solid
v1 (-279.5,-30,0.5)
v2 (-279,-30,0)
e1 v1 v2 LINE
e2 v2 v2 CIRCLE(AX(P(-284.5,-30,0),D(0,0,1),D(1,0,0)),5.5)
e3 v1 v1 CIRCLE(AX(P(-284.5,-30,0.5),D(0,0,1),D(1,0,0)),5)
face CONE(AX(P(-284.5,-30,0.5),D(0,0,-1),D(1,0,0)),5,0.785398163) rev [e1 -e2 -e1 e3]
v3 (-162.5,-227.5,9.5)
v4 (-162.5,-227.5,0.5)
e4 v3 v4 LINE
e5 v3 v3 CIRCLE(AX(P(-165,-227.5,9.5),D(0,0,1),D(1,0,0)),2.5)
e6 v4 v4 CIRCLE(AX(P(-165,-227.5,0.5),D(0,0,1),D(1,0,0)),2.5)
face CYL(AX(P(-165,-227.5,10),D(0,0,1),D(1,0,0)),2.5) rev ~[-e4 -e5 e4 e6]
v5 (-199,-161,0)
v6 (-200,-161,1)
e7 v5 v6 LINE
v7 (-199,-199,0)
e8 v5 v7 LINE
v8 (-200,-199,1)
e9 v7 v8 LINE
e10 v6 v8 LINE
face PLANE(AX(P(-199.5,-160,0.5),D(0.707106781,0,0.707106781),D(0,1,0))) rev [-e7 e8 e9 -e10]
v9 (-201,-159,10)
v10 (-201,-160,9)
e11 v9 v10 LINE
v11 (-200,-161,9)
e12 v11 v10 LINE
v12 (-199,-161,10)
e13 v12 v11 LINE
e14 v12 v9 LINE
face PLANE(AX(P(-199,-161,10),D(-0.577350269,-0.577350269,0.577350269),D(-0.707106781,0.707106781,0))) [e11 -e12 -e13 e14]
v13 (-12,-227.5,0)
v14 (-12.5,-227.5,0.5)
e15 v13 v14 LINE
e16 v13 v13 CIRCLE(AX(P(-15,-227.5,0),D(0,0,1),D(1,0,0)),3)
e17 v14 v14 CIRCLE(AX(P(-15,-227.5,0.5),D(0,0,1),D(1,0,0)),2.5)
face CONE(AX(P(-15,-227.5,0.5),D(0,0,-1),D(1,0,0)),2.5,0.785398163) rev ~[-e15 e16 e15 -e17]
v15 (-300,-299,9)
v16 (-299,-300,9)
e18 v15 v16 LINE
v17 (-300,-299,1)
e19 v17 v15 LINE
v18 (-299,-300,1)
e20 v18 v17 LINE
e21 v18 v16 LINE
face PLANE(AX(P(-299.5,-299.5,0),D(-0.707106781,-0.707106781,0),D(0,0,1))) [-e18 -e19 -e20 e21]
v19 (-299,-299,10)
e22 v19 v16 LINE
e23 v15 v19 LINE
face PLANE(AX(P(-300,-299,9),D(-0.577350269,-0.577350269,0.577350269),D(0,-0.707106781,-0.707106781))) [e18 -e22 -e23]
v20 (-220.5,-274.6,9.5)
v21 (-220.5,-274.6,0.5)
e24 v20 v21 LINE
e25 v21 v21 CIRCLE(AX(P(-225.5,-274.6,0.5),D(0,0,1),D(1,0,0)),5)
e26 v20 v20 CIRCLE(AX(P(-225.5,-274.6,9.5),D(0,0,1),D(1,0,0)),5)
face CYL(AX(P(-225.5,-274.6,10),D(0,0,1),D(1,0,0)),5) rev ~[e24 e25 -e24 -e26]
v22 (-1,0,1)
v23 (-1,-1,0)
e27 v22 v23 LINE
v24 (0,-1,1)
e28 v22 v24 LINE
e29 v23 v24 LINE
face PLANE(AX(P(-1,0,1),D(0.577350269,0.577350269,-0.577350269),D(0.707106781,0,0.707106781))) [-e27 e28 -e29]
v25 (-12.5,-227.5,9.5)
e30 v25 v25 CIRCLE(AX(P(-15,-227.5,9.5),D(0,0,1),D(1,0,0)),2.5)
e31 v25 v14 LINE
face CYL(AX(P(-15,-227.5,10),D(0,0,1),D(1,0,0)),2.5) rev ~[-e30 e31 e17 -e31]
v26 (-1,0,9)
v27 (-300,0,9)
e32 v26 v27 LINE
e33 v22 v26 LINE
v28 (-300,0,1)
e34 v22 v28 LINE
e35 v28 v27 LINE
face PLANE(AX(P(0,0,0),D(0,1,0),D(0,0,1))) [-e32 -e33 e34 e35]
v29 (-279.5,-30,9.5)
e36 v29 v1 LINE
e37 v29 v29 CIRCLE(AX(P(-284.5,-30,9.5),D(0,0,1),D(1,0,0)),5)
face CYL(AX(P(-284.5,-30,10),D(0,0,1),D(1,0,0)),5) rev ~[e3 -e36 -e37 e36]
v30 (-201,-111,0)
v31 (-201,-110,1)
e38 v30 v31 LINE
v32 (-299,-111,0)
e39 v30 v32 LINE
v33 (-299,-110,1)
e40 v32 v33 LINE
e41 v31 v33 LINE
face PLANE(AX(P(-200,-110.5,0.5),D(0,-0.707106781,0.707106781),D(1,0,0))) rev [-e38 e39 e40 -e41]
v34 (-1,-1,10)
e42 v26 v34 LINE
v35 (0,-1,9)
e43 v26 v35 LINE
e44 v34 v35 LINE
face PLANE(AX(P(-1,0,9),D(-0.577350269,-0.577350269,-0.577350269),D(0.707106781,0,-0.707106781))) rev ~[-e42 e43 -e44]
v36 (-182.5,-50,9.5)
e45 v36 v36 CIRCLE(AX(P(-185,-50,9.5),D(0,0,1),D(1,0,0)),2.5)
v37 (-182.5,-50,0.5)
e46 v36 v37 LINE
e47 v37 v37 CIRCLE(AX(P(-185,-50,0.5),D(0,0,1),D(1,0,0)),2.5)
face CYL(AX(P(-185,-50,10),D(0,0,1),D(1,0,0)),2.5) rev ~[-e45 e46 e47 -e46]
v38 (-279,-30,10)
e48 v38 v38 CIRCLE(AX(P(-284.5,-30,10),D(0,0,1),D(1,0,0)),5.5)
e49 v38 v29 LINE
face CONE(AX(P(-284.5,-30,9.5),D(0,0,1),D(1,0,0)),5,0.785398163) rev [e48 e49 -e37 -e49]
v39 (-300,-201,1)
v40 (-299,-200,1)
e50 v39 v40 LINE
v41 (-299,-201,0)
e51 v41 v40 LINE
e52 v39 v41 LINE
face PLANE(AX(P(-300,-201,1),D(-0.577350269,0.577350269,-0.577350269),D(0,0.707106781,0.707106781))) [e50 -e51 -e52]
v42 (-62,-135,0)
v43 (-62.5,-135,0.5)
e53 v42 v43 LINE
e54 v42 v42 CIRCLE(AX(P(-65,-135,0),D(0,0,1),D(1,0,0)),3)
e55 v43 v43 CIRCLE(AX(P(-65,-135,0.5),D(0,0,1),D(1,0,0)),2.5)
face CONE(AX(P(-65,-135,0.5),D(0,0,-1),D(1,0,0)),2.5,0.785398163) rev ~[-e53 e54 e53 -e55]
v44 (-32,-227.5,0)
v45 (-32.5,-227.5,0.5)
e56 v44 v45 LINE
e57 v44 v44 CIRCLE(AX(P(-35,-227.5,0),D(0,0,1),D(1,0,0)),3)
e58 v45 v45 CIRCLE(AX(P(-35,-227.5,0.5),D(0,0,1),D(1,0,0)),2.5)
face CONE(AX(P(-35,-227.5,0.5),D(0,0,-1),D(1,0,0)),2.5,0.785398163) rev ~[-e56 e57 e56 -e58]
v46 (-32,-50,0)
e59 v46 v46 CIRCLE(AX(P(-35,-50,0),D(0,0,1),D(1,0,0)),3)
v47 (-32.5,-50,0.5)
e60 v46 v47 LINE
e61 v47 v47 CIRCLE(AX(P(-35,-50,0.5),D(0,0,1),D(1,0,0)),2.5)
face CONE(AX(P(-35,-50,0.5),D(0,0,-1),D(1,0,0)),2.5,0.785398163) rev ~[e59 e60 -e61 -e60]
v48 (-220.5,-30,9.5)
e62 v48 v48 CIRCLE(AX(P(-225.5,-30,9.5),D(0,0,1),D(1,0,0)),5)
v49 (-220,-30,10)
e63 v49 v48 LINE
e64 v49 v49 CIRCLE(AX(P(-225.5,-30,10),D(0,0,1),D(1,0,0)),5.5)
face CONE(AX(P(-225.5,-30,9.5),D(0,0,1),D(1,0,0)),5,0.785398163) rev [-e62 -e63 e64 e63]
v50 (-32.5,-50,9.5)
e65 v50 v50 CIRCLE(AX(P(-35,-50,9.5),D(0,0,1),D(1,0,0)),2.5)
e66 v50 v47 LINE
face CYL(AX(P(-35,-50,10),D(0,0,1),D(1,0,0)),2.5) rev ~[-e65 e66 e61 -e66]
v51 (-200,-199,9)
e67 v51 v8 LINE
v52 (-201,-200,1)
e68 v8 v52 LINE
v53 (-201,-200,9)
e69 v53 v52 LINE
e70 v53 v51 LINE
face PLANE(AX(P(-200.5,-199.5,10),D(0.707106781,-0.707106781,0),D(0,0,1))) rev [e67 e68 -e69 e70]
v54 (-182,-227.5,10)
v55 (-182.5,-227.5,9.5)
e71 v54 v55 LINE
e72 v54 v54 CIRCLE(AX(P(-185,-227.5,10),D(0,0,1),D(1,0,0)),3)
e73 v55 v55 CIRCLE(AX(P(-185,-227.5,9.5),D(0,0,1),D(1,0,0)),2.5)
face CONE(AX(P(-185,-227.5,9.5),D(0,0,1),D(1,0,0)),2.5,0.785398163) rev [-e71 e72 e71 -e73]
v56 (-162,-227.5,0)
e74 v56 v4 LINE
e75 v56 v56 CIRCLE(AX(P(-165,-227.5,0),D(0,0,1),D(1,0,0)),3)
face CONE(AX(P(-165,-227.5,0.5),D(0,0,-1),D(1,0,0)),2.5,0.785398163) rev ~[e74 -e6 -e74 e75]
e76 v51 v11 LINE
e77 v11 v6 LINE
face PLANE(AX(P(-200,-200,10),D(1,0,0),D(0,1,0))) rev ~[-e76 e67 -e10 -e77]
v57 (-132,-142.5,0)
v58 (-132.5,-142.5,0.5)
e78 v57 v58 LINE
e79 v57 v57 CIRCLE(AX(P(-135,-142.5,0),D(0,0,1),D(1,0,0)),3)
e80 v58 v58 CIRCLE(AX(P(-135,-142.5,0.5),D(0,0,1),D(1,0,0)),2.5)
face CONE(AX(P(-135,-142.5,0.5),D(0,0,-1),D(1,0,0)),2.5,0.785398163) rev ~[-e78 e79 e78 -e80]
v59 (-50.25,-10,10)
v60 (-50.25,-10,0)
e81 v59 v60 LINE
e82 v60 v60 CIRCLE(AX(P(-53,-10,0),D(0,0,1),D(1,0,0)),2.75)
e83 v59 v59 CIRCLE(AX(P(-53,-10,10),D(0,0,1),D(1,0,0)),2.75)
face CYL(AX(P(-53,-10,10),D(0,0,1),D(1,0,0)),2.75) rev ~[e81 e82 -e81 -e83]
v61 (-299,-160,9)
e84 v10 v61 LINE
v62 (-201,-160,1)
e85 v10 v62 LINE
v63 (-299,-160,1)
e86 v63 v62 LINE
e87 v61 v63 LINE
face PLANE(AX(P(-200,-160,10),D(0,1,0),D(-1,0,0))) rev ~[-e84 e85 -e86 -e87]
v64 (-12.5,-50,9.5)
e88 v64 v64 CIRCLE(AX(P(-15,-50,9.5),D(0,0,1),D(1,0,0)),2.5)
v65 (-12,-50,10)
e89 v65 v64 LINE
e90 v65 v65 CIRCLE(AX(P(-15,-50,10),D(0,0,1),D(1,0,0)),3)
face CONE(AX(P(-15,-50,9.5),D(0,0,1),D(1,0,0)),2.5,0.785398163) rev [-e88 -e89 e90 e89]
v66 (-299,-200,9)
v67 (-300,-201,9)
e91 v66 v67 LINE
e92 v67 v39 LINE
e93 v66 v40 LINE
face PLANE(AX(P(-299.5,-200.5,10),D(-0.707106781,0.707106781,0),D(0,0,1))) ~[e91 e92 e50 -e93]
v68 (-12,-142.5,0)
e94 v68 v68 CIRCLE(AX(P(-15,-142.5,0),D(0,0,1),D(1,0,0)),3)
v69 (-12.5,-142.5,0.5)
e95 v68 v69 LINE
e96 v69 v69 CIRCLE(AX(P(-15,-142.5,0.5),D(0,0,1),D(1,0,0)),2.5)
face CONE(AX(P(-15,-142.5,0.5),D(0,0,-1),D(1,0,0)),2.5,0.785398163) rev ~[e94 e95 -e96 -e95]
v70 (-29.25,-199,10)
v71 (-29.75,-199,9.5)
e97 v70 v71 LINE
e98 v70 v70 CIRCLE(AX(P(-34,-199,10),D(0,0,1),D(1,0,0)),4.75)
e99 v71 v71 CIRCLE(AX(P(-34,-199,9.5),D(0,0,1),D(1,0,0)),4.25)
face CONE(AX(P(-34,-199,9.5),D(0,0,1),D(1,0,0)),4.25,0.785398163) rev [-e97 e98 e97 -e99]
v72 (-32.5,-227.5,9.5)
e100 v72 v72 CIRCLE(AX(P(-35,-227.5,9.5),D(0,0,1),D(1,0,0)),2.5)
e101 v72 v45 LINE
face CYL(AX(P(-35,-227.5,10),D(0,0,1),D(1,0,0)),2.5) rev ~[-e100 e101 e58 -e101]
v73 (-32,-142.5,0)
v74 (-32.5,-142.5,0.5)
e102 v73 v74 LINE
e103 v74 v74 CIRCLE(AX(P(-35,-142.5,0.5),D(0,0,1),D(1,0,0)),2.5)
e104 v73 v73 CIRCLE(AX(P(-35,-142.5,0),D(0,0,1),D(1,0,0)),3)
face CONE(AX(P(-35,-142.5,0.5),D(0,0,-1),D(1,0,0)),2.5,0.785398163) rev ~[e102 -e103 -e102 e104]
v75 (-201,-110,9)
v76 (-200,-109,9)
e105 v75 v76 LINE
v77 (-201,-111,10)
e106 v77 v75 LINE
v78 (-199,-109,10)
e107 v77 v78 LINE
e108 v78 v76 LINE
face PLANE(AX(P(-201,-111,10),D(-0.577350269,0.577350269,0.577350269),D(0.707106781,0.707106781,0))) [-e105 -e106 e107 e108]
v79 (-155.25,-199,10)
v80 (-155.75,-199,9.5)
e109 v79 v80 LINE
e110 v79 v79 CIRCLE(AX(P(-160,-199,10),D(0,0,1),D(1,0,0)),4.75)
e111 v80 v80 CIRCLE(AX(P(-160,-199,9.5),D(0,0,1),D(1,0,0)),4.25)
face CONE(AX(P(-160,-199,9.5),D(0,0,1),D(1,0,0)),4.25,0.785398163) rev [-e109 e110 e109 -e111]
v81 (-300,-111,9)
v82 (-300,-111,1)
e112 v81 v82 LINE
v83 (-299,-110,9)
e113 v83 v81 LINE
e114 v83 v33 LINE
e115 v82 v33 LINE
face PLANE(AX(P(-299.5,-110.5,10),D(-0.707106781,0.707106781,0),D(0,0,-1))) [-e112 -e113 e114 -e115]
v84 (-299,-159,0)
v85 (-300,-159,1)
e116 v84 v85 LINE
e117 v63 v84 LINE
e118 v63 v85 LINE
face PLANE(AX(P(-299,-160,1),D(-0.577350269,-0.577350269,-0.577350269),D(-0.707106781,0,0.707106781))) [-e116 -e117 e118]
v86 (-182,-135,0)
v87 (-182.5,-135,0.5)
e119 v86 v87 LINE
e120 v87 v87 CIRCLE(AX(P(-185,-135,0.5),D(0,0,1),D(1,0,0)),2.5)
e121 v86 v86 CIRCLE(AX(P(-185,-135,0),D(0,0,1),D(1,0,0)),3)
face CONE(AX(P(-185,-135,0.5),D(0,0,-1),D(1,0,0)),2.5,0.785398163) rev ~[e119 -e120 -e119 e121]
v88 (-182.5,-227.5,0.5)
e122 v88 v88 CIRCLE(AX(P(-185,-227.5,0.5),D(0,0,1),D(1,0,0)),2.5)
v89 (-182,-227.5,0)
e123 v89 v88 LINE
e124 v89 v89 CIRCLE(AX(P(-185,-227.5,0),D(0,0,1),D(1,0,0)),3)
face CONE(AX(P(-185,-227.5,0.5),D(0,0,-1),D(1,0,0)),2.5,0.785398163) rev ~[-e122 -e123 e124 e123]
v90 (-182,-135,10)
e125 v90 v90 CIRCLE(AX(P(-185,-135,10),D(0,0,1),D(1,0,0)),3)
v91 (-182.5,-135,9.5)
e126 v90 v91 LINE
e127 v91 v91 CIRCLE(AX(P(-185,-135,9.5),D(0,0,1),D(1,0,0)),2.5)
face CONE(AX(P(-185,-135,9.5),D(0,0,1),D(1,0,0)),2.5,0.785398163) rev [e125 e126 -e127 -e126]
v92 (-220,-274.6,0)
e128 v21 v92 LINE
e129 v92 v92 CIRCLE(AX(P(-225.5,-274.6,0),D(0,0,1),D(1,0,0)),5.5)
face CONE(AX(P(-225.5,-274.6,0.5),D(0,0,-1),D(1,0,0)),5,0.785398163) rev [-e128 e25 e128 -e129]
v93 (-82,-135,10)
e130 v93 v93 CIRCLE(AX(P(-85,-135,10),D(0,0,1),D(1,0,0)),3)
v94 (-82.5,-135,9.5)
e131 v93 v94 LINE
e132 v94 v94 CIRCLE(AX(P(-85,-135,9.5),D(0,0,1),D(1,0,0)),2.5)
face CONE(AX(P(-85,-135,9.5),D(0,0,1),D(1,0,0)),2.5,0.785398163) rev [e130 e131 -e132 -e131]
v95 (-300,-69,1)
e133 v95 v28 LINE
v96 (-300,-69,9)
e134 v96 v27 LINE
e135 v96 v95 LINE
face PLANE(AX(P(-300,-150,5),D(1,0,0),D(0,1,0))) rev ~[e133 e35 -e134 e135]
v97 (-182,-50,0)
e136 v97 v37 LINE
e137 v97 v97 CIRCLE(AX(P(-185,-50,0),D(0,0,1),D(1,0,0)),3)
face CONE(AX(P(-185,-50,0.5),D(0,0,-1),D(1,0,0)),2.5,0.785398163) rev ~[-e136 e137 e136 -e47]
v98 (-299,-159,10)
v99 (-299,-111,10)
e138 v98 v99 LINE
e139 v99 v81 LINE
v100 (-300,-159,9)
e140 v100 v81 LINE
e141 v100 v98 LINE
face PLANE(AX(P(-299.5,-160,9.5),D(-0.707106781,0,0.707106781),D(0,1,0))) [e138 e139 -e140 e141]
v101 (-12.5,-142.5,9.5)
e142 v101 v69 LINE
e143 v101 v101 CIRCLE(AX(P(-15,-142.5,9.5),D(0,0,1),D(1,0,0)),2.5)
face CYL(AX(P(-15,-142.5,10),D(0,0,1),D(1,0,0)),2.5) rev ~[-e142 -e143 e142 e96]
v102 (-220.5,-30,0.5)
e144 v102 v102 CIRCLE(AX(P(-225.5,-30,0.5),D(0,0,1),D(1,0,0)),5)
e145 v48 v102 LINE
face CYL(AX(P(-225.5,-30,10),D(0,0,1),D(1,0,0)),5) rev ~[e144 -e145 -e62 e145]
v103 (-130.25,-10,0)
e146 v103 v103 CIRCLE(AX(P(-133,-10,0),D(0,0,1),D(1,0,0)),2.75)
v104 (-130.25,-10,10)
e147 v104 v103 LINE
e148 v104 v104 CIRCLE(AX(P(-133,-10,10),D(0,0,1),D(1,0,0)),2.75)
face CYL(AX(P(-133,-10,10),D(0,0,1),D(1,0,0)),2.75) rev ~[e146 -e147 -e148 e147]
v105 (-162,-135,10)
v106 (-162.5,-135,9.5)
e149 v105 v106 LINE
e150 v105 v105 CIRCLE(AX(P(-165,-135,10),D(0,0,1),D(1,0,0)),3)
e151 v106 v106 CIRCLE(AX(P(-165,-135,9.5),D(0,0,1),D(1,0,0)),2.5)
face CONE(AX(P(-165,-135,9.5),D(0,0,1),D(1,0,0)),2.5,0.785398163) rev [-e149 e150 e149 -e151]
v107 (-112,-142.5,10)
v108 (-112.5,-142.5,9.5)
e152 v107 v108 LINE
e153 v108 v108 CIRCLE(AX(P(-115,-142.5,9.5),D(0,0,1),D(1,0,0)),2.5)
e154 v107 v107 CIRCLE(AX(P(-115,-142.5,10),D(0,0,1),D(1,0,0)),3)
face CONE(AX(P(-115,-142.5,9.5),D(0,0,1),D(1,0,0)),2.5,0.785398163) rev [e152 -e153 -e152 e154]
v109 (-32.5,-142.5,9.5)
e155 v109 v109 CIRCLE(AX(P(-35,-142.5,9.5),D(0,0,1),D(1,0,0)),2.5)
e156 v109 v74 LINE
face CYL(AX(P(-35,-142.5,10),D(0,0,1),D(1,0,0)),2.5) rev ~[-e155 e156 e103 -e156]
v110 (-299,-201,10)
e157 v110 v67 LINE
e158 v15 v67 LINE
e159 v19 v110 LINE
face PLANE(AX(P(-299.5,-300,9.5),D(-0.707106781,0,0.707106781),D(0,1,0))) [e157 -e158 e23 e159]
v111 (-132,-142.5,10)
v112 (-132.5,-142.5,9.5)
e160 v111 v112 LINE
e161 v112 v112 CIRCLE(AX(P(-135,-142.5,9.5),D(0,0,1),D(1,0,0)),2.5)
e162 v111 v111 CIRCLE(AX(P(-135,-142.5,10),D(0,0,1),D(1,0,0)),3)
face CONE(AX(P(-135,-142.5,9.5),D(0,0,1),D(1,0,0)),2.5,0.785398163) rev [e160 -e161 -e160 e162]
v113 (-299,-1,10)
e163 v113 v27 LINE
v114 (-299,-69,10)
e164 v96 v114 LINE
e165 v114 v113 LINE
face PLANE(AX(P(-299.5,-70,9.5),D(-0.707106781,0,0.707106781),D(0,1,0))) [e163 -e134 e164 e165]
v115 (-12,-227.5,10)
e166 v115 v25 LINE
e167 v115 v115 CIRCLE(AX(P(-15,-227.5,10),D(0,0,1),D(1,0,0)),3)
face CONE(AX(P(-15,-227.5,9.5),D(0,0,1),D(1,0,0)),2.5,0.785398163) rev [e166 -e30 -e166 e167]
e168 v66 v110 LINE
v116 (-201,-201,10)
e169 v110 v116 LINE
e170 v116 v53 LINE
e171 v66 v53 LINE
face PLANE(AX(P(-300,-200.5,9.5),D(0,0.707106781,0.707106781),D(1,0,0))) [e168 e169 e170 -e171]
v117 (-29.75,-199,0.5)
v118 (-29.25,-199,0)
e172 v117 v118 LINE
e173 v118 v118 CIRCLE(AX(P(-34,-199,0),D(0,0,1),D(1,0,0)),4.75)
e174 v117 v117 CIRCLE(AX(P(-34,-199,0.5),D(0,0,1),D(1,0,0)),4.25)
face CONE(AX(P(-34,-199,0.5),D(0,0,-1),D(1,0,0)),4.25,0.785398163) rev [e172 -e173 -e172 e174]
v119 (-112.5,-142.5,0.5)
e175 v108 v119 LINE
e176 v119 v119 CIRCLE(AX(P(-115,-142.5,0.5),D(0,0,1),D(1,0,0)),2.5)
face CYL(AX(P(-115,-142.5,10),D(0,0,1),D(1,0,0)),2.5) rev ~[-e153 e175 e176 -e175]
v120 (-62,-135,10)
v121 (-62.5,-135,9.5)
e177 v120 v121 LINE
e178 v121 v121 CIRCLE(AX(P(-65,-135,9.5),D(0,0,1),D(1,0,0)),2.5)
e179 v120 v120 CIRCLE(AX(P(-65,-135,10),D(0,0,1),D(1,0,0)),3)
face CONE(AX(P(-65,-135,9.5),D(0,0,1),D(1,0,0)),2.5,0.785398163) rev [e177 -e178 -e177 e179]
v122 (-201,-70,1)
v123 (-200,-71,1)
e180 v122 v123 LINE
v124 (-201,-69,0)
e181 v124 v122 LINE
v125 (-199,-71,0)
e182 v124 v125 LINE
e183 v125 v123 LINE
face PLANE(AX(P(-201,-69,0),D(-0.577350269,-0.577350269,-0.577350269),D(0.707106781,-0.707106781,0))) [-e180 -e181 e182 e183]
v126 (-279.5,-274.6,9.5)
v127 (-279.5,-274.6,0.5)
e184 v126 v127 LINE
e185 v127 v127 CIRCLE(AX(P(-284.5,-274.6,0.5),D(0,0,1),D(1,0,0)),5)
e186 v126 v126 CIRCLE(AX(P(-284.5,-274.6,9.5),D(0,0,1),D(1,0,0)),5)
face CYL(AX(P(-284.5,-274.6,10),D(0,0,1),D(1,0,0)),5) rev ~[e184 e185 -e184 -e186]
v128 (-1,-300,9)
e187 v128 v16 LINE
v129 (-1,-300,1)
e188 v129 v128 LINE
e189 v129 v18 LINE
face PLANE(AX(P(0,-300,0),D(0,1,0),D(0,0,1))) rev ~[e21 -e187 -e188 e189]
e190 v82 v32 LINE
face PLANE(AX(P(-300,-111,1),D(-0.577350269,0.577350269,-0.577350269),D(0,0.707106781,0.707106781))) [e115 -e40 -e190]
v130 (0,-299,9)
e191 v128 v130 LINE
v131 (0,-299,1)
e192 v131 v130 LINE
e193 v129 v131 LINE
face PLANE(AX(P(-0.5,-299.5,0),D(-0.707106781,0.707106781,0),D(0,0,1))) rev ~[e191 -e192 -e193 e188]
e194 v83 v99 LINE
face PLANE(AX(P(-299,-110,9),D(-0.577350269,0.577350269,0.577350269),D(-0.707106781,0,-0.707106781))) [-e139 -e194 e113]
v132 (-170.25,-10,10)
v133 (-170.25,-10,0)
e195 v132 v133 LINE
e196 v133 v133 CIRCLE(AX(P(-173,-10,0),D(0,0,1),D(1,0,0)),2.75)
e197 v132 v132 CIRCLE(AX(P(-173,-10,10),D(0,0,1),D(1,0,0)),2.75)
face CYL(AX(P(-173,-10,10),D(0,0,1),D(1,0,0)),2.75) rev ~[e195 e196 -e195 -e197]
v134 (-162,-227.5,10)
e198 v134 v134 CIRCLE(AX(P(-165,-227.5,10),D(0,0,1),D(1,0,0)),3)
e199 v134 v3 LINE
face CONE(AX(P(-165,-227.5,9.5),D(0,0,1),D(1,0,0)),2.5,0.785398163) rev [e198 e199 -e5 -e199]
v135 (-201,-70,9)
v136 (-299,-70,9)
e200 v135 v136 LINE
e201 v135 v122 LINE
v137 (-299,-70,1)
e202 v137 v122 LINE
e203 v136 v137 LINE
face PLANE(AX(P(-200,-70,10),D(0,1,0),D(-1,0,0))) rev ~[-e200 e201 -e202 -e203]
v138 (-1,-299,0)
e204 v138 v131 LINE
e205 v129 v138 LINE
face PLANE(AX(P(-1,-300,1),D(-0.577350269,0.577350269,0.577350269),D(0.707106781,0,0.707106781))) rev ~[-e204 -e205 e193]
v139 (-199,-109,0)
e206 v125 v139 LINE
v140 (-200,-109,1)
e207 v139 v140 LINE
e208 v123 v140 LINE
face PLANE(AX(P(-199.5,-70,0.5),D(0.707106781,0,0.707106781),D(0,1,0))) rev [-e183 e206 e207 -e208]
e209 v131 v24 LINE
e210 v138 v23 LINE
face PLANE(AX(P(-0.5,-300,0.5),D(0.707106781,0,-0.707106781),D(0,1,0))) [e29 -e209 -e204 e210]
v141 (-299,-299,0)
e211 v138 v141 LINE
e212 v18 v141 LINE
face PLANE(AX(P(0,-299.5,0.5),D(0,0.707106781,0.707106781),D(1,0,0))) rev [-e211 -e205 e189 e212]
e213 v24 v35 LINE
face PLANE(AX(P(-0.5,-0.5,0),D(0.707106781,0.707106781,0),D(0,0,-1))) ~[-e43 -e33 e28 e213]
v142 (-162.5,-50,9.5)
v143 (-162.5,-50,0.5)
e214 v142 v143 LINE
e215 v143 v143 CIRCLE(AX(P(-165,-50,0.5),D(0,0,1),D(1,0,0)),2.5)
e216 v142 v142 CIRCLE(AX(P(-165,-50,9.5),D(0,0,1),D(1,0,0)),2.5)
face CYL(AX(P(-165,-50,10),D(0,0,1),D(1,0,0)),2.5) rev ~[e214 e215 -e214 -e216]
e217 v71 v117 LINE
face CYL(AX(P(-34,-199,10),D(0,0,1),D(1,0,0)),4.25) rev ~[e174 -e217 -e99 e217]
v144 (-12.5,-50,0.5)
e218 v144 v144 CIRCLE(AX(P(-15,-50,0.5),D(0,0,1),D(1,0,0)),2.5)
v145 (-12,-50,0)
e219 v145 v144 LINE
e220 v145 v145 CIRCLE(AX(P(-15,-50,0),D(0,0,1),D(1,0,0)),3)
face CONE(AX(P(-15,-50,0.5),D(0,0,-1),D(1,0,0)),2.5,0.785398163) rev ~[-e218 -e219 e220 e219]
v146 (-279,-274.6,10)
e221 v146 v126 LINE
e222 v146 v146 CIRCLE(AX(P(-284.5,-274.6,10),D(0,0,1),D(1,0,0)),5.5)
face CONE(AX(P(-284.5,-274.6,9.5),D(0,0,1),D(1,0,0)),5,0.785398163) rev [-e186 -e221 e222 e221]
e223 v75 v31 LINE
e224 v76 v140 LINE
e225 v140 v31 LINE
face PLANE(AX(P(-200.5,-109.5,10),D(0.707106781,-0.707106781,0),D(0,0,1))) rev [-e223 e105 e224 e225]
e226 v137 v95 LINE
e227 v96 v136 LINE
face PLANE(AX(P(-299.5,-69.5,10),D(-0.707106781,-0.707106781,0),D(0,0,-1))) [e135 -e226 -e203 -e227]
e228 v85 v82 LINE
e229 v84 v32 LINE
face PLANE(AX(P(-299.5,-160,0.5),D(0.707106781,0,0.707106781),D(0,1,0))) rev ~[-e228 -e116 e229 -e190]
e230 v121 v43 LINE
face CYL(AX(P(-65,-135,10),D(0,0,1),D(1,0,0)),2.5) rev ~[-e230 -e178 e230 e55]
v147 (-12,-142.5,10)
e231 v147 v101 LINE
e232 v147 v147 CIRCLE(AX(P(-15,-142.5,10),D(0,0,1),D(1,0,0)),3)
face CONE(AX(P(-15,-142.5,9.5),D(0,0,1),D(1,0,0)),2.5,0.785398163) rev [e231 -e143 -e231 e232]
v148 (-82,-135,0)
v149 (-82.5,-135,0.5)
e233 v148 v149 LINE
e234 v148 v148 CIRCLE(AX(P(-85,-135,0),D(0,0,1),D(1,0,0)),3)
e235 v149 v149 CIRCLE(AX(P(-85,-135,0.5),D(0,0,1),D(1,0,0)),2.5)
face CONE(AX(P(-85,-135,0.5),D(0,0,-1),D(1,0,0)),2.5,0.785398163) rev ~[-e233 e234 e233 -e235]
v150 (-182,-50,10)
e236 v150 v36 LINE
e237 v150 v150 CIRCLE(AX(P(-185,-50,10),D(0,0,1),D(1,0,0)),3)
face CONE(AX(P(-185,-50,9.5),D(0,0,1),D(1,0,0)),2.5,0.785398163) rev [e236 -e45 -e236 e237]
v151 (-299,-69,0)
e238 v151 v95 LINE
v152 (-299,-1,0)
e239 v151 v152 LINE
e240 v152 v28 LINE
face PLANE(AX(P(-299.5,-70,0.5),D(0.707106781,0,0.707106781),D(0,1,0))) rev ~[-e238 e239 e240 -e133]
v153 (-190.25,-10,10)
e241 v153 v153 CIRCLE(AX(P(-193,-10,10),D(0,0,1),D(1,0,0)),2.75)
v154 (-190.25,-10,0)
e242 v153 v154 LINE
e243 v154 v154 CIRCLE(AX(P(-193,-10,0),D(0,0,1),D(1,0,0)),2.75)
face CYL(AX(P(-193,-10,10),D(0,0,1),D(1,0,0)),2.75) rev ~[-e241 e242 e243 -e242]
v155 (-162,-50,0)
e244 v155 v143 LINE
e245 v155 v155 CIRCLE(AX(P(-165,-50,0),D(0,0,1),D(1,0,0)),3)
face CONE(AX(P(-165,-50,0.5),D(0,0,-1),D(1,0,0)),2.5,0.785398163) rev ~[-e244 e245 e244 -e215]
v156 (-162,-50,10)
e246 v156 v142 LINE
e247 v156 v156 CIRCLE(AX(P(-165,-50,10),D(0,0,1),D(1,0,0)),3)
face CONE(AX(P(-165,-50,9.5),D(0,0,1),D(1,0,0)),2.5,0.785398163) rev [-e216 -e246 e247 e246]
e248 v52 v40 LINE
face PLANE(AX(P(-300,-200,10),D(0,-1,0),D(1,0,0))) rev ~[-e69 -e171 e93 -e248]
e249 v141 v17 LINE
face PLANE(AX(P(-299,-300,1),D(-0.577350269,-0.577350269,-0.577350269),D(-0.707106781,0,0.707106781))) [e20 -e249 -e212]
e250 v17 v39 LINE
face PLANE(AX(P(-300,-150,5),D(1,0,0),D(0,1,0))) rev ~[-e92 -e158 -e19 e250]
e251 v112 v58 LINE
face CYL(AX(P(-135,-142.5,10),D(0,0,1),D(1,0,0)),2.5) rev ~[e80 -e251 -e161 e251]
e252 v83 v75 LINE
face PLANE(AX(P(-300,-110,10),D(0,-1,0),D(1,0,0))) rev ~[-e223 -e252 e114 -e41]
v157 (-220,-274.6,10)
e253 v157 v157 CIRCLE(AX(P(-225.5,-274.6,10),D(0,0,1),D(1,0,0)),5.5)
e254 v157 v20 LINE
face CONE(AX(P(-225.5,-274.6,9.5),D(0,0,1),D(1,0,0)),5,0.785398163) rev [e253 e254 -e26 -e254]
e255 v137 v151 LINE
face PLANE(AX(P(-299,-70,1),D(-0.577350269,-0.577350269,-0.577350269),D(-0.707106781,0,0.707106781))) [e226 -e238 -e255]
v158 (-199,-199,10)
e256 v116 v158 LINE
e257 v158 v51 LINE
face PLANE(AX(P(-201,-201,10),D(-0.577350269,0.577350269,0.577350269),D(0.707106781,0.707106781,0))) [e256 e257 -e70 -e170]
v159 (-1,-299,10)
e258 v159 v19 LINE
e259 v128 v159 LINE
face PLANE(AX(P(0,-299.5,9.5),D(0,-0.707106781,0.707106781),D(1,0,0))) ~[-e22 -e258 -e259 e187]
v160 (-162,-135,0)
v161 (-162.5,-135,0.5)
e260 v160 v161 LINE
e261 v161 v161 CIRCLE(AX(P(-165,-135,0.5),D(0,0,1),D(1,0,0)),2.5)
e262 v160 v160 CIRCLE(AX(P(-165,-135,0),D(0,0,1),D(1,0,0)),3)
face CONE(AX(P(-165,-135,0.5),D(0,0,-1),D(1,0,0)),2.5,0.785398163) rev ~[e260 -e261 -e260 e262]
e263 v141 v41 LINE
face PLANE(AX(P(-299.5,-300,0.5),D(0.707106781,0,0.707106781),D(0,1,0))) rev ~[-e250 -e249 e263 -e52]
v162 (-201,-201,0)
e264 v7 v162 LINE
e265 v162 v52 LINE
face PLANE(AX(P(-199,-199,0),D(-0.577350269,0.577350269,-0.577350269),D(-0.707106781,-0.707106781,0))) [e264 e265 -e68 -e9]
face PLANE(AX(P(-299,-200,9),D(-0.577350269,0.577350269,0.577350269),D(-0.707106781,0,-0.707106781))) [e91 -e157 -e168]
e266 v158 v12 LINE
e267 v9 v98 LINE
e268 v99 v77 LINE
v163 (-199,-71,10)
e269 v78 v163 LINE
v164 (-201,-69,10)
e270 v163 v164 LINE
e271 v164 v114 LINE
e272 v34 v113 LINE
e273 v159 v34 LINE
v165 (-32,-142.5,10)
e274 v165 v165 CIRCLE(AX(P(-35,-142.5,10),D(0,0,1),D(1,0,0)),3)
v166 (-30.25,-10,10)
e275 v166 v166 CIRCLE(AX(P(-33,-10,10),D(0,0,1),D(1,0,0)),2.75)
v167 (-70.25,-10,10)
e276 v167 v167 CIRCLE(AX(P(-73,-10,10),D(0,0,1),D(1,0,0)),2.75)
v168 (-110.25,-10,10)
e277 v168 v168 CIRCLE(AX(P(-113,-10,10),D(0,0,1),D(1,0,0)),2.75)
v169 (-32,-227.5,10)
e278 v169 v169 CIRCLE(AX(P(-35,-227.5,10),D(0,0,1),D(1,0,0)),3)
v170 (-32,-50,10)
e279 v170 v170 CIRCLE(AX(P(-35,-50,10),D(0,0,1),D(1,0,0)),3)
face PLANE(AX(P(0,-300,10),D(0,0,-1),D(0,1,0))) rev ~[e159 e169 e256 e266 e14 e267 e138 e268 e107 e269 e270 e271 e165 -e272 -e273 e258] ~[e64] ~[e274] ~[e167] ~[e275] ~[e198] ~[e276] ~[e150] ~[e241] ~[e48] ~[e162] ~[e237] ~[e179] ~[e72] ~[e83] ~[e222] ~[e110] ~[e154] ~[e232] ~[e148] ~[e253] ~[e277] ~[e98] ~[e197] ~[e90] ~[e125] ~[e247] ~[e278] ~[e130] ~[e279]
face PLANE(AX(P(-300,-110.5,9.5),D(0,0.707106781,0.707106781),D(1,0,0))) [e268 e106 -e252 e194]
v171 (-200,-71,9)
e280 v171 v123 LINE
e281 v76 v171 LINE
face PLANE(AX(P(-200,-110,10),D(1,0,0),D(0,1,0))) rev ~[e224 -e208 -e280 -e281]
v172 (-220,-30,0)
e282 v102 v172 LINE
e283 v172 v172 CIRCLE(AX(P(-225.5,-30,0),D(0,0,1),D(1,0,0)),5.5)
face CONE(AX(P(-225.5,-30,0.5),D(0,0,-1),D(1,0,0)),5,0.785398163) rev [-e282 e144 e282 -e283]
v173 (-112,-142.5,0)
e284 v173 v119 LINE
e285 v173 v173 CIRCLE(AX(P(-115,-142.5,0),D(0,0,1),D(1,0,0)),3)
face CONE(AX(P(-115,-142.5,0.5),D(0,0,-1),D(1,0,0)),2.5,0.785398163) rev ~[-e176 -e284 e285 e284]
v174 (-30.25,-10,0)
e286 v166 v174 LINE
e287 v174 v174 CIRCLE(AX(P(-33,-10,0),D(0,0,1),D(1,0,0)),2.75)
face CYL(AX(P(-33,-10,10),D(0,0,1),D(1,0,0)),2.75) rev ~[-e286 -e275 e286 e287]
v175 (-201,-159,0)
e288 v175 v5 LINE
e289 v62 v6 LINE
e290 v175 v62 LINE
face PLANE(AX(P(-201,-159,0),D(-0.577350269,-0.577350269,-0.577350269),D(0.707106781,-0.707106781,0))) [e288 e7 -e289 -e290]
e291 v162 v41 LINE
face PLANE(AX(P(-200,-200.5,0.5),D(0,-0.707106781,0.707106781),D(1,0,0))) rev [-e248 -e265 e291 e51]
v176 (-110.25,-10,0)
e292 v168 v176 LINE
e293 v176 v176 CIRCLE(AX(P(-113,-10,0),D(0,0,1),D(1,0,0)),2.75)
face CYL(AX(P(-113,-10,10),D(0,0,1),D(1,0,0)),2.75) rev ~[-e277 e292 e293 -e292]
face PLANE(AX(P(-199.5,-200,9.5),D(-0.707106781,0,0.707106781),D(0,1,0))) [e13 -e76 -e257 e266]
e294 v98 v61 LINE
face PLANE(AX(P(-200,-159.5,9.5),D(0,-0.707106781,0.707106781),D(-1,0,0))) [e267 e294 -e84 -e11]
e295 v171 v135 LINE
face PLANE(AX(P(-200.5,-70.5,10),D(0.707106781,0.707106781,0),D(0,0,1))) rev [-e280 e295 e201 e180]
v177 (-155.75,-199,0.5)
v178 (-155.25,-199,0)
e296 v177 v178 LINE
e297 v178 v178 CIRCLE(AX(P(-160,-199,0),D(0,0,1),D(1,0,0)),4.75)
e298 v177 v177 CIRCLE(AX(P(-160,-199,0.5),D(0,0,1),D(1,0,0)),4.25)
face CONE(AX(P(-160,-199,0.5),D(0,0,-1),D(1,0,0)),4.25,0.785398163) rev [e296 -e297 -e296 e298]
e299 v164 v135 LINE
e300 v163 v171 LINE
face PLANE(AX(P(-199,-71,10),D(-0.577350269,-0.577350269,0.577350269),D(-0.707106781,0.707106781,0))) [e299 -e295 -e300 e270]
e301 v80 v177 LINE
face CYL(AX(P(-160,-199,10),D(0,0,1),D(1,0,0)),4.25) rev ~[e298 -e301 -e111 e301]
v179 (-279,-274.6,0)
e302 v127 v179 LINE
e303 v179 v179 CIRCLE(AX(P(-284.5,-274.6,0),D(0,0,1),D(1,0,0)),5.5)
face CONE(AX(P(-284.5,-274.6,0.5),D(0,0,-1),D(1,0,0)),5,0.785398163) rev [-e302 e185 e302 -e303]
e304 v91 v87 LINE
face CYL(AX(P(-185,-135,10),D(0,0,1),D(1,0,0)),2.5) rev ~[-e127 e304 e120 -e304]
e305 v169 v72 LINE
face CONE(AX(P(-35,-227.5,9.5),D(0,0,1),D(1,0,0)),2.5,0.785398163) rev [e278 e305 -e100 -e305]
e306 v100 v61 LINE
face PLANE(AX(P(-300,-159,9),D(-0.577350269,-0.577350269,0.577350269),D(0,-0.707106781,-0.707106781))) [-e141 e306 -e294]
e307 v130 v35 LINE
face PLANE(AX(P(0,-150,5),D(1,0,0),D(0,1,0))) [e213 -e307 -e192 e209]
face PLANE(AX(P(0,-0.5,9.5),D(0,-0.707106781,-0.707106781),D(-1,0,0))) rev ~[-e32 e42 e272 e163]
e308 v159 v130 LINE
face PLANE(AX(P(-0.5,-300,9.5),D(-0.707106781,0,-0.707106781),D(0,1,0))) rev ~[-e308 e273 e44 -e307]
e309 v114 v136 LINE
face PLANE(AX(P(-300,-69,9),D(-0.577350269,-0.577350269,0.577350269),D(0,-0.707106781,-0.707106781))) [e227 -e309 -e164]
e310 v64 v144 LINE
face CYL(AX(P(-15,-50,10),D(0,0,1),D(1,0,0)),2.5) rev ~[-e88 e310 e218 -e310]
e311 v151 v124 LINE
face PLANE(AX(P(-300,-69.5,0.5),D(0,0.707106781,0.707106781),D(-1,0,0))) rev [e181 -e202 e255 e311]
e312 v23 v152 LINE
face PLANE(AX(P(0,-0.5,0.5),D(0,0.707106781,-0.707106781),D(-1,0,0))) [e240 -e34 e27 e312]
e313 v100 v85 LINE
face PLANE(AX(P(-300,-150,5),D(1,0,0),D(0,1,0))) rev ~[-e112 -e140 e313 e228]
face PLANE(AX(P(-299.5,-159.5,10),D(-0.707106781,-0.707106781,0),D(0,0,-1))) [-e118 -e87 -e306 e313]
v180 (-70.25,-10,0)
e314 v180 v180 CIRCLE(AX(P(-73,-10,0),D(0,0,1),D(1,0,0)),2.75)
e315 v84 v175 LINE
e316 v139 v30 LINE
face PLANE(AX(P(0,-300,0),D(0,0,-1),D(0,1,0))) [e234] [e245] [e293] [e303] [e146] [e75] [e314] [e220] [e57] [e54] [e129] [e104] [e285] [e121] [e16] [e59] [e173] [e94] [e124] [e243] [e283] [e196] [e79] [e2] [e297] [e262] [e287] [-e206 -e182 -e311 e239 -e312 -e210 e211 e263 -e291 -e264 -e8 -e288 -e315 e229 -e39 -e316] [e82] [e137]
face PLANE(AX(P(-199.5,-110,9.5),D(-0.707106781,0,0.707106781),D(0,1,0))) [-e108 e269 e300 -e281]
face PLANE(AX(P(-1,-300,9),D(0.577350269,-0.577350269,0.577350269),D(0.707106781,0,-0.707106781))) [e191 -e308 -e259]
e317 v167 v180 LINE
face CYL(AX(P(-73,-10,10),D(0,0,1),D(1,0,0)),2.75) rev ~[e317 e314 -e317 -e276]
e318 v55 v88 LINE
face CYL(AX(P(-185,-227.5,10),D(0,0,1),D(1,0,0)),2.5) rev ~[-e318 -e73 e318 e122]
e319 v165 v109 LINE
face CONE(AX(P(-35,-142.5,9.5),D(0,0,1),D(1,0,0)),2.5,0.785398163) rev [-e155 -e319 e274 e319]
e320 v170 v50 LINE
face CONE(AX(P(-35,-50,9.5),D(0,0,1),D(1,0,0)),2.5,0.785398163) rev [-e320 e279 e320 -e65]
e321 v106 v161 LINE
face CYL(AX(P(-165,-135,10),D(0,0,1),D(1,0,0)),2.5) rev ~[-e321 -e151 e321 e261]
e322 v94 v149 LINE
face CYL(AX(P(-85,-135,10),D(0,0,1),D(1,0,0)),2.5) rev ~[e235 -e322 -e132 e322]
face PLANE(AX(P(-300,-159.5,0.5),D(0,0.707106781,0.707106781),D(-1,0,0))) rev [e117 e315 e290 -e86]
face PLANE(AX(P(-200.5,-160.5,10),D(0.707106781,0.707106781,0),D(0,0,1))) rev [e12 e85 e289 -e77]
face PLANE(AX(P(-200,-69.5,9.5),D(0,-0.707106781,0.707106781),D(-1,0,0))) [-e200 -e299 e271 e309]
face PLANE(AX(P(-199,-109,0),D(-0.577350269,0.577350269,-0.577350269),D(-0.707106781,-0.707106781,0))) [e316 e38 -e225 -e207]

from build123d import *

# Parameters (mm, degrees)
F0_W      = 300
F0_H      = 10
F1_DEPTH  = 300
F3_DEPTH  = 10.001
F4_SIZE   = 1
F5_R      = 2.5
F6_DEPTH  = 25
F7_SIZE   = 0.5
F8_R      = 5
F9_DEPTH  = 10.001
F10_SIZE  = 0.5
F11_R     = 4.25
F12_DEPTH = 10.001
F13_SIZE  = 0.5
F14_R     = 2.75
F15_DEPTH = 10.001


# Not quite as in the source:
# - a feature names something its author has since deleted; it is built from what else it names


with BuildPart() as f1:
    # F0 (on Right) → F1 (new body)
    with BuildSketch(Plane.YZ):
        with Locations((-150, 5)):
            Rectangle(F0_W, F0_H)
    extrude(amount=-F1_DEPTH)

    # F2 (on face) → F3 (cut, through all)
    with BuildSketch(Plane.XY.offset(10)):
        Polygon((-200, -70), (-300, -70), (-300, -110), (-200, -110), (-200, -90), align=None)
        Polygon((-200, -160), (-300, -160), (-300, -200), (-200, -200), (-200, -180), align=None)
    extrude(amount=-F3_DEPTH, mode=Mode.SUBTRACT)

    # F4
    f4_edges = [f1.edges().sort_by_distance(p)[0] for p in [
        (0, -150, 10),
        (-150, -300, 10),
        (-300, -250, 10),
        (-250, -200, 10),
        (-200, -180, 10),
        (-250, -160, 10),
        (-300, -135, 10),
        (-250, -110, 10),
        (-200, -90, 10),
        (-250, -70, 10),
        (-300, -35, 10),
        (-150, 0, 10),
        (0, -150, 0),
        (-150, 0, 0),
        (-300, -35, 0),
        (-250, -70, 0),
        (-200, -90, 0),
        (-250, -110, 0),
        (-300, -135, 0),
        (-250, -160, 0),
        (-200, -180, 0),
        (-250, -200, 0),
        (-300, -250, 0),
        (-150, -300, 0),
        (0, -300, 5),
        (0, 0, 5),
        (-300, -70, 5),
        (-200, -70, 5),
        (-200, -110, 5),
        (-300, -110, 5),
        (-300, -160, 5),
        (-200, -160, 5),
        (-200, -200, 5),
        (-300, -200, 5),
        (-300, -300, 5),
    ]]
    chamfer(f4_edges, length=F4_SIZE)

    # F5 (on face) → F6 (cut)
    with BuildSketch(Plane.XY.offset(10)):
        with Locations((-15, -50)):
            Circle(F5_R)
        with Locations((-35, -50)):
            Circle(F5_R)
        with Locations((-165, -50)):
            Circle(F5_R)
        with Locations((-185, -50)):
            Circle(F5_R)
        with Locations((-65, -135)):
            Circle(F5_R)
        with Locations((-85, -135)):
            Circle(F5_R)
        with Locations((-165, -135)):
            Circle(F5_R)
        with Locations((-185, -135)):
            Circle(F5_R)
        with Locations((-15, -227.5)):
            Circle(F5_R)
        with Locations((-35, -227.5)):
            Circle(F5_R)
        with Locations((-165, -227.5)):
            Circle(F5_R)
        with Locations((-185, -227.5)):
            Circle(F5_R)
        with Locations((-15, -142.5)):
            Circle(F5_R)
        with Locations((-35, -142.5)):
            Circle(F5_R)
        with Locations((-115, -142.5)):
            Circle(F5_R)
        with Locations((-135, -142.5)):
            Circle(F5_R)
    extrude(amount=-F6_DEPTH, mode=Mode.SUBTRACT)

    # F7
    f7_edges = [f1.edges().sort_by_distance(p)[0] for p in [
        (-17.5, -50, 10),
        (-12.5, -50, 5),
        (-17.5, -50, 0),
        (-37.5, -50, 10),
        (-32.5, -50, 5),
        (-37.5, -50, 0),
        (-167.5, -50, 10),
        (-162.5, -50, 5),
        (-167.5, -50, 0),
        (-187.5, -50, 10),
        (-182.5, -50, 5),
        (-187.5, -50, 0),
        (-67.5, -135, 10),
        (-62.5, -135, 5),
        (-67.5, -135, 0),
        (-87.5, -135, 10),
        (-82.5, -135, 5),
        (-87.5, -135, 0),
        (-187.5, -135, 10),
        (-182.5, -135, 5),
        (-187.5, -135, 0),
        (-167.5, -135, 10),
        (-162.5, -135, 5),
        (-167.5, -135, 0),
        (-17.5, -142.5, 10),
        (-12.5, -142.5, 5),
        (-17.5, -142.5, 0),
        (-37.5, -142.5, 10),
        (-32.5, -142.5, 5),
        (-37.5, -142.5, 0),
        (-117.5, -142.5, 10),
        (-112.5, -142.5, 5),
        (-117.5, -142.5, 0),
        (-137.5, -142.5, 10),
        (-132.5, -142.5, 5),
        (-137.5, -142.5, 0),
        (-17.5, -227.5, 10),
        (-12.5, -227.5, 5),
        (-17.5, -227.5, 0),
        (-37.5, -227.5, 10),
        (-32.5, -227.5, 5),
        (-37.5, -227.5, 0),
        (-167.5, -227.5, 10),
        (-162.5, -227.5, 5),
        (-167.5, -227.5, 0),
        (-187.5, -227.5, 10),
        (-182.5, -227.5, 5),
        (-187.5, -227.5, 0),
    ]]
    chamfer(f7_edges, length=F7_SIZE)

    # F8 (on face) → F9 (cut, through all)
    with BuildSketch(Plane.XY.offset(10)):
        with Locations((-284.5, -274.6)):
            Circle(F8_R)
        with Locations((-225.5, -274.6)):
            Circle(F8_R)
        with Locations((-284.5, -30)):
            Circle(F8_R)
        with Locations((-225.5, -30)):
            Circle(F8_R)
    extrude(amount=-F9_DEPTH, mode=Mode.SUBTRACT)

    # F10
    f10_edges = [f1.edges().sort_by_distance(p)[0] for p in [
        (-289.5, -30, 10),
        (-279.5, -30, 5),
        (-289.5, -30, 0),
        (-230.5, -30, 10),
        (-220.5, -30, 5),
        (-230.5, -30, 0),
        (-289.5, -274.6, 10),
        (-279.5, -274.6, 5),
        (-289.5, -274.6, 0),
        (-230.5, -274.6, 10),
        (-220.5, -274.6, 5),
        (-230.5, -274.6, 0),
    ]]
    chamfer(f10_edges, length=F10_SIZE)

    # F11 (on face) → F12 (cut, through all)
    with BuildSketch(Plane.XY.offset(10)):
        with Locations((-34, -199)):
            Circle(F11_R)
        with Locations((-160, -199)):
            Circle(F11_R)
    extrude(amount=-F12_DEPTH, mode=Mode.SUBTRACT)

    # F13
    f13_edges = [f1.edges().sort_by_distance(p)[0] for p in [
        (-164.25, -199, 10),
        (-155.75, -199, 5),
        (-164.25, -199, 0),
        (-38.25, -199, 10),
        (-29.75, -199, 5),
        (-38.25, -199, 0),
    ]]
    chamfer(f13_edges, length=F13_SIZE)

    # F14 (on face) → F15 (cut, through all)
    with BuildSketch(Plane.XY.offset(10)):
        with Locations((-193, -10)):
            Circle(F14_R)
        with Locations((-173, -10)):
            Circle(F14_R)
        with Locations((-133, -10)):
            Circle(F14_R)
        with Locations((-113, -10)):
            Circle(F14_R)
        with Locations((-73, -10)):
            Circle(F14_R)
        with Locations((-53, -10)):
            Circle(F14_R)
        with Locations((-33, -10)):
            Circle(F14_R)
    extrude(amount=-F15_DEPTH, mode=Mode.SUBTRACT)


solid = f1.part
